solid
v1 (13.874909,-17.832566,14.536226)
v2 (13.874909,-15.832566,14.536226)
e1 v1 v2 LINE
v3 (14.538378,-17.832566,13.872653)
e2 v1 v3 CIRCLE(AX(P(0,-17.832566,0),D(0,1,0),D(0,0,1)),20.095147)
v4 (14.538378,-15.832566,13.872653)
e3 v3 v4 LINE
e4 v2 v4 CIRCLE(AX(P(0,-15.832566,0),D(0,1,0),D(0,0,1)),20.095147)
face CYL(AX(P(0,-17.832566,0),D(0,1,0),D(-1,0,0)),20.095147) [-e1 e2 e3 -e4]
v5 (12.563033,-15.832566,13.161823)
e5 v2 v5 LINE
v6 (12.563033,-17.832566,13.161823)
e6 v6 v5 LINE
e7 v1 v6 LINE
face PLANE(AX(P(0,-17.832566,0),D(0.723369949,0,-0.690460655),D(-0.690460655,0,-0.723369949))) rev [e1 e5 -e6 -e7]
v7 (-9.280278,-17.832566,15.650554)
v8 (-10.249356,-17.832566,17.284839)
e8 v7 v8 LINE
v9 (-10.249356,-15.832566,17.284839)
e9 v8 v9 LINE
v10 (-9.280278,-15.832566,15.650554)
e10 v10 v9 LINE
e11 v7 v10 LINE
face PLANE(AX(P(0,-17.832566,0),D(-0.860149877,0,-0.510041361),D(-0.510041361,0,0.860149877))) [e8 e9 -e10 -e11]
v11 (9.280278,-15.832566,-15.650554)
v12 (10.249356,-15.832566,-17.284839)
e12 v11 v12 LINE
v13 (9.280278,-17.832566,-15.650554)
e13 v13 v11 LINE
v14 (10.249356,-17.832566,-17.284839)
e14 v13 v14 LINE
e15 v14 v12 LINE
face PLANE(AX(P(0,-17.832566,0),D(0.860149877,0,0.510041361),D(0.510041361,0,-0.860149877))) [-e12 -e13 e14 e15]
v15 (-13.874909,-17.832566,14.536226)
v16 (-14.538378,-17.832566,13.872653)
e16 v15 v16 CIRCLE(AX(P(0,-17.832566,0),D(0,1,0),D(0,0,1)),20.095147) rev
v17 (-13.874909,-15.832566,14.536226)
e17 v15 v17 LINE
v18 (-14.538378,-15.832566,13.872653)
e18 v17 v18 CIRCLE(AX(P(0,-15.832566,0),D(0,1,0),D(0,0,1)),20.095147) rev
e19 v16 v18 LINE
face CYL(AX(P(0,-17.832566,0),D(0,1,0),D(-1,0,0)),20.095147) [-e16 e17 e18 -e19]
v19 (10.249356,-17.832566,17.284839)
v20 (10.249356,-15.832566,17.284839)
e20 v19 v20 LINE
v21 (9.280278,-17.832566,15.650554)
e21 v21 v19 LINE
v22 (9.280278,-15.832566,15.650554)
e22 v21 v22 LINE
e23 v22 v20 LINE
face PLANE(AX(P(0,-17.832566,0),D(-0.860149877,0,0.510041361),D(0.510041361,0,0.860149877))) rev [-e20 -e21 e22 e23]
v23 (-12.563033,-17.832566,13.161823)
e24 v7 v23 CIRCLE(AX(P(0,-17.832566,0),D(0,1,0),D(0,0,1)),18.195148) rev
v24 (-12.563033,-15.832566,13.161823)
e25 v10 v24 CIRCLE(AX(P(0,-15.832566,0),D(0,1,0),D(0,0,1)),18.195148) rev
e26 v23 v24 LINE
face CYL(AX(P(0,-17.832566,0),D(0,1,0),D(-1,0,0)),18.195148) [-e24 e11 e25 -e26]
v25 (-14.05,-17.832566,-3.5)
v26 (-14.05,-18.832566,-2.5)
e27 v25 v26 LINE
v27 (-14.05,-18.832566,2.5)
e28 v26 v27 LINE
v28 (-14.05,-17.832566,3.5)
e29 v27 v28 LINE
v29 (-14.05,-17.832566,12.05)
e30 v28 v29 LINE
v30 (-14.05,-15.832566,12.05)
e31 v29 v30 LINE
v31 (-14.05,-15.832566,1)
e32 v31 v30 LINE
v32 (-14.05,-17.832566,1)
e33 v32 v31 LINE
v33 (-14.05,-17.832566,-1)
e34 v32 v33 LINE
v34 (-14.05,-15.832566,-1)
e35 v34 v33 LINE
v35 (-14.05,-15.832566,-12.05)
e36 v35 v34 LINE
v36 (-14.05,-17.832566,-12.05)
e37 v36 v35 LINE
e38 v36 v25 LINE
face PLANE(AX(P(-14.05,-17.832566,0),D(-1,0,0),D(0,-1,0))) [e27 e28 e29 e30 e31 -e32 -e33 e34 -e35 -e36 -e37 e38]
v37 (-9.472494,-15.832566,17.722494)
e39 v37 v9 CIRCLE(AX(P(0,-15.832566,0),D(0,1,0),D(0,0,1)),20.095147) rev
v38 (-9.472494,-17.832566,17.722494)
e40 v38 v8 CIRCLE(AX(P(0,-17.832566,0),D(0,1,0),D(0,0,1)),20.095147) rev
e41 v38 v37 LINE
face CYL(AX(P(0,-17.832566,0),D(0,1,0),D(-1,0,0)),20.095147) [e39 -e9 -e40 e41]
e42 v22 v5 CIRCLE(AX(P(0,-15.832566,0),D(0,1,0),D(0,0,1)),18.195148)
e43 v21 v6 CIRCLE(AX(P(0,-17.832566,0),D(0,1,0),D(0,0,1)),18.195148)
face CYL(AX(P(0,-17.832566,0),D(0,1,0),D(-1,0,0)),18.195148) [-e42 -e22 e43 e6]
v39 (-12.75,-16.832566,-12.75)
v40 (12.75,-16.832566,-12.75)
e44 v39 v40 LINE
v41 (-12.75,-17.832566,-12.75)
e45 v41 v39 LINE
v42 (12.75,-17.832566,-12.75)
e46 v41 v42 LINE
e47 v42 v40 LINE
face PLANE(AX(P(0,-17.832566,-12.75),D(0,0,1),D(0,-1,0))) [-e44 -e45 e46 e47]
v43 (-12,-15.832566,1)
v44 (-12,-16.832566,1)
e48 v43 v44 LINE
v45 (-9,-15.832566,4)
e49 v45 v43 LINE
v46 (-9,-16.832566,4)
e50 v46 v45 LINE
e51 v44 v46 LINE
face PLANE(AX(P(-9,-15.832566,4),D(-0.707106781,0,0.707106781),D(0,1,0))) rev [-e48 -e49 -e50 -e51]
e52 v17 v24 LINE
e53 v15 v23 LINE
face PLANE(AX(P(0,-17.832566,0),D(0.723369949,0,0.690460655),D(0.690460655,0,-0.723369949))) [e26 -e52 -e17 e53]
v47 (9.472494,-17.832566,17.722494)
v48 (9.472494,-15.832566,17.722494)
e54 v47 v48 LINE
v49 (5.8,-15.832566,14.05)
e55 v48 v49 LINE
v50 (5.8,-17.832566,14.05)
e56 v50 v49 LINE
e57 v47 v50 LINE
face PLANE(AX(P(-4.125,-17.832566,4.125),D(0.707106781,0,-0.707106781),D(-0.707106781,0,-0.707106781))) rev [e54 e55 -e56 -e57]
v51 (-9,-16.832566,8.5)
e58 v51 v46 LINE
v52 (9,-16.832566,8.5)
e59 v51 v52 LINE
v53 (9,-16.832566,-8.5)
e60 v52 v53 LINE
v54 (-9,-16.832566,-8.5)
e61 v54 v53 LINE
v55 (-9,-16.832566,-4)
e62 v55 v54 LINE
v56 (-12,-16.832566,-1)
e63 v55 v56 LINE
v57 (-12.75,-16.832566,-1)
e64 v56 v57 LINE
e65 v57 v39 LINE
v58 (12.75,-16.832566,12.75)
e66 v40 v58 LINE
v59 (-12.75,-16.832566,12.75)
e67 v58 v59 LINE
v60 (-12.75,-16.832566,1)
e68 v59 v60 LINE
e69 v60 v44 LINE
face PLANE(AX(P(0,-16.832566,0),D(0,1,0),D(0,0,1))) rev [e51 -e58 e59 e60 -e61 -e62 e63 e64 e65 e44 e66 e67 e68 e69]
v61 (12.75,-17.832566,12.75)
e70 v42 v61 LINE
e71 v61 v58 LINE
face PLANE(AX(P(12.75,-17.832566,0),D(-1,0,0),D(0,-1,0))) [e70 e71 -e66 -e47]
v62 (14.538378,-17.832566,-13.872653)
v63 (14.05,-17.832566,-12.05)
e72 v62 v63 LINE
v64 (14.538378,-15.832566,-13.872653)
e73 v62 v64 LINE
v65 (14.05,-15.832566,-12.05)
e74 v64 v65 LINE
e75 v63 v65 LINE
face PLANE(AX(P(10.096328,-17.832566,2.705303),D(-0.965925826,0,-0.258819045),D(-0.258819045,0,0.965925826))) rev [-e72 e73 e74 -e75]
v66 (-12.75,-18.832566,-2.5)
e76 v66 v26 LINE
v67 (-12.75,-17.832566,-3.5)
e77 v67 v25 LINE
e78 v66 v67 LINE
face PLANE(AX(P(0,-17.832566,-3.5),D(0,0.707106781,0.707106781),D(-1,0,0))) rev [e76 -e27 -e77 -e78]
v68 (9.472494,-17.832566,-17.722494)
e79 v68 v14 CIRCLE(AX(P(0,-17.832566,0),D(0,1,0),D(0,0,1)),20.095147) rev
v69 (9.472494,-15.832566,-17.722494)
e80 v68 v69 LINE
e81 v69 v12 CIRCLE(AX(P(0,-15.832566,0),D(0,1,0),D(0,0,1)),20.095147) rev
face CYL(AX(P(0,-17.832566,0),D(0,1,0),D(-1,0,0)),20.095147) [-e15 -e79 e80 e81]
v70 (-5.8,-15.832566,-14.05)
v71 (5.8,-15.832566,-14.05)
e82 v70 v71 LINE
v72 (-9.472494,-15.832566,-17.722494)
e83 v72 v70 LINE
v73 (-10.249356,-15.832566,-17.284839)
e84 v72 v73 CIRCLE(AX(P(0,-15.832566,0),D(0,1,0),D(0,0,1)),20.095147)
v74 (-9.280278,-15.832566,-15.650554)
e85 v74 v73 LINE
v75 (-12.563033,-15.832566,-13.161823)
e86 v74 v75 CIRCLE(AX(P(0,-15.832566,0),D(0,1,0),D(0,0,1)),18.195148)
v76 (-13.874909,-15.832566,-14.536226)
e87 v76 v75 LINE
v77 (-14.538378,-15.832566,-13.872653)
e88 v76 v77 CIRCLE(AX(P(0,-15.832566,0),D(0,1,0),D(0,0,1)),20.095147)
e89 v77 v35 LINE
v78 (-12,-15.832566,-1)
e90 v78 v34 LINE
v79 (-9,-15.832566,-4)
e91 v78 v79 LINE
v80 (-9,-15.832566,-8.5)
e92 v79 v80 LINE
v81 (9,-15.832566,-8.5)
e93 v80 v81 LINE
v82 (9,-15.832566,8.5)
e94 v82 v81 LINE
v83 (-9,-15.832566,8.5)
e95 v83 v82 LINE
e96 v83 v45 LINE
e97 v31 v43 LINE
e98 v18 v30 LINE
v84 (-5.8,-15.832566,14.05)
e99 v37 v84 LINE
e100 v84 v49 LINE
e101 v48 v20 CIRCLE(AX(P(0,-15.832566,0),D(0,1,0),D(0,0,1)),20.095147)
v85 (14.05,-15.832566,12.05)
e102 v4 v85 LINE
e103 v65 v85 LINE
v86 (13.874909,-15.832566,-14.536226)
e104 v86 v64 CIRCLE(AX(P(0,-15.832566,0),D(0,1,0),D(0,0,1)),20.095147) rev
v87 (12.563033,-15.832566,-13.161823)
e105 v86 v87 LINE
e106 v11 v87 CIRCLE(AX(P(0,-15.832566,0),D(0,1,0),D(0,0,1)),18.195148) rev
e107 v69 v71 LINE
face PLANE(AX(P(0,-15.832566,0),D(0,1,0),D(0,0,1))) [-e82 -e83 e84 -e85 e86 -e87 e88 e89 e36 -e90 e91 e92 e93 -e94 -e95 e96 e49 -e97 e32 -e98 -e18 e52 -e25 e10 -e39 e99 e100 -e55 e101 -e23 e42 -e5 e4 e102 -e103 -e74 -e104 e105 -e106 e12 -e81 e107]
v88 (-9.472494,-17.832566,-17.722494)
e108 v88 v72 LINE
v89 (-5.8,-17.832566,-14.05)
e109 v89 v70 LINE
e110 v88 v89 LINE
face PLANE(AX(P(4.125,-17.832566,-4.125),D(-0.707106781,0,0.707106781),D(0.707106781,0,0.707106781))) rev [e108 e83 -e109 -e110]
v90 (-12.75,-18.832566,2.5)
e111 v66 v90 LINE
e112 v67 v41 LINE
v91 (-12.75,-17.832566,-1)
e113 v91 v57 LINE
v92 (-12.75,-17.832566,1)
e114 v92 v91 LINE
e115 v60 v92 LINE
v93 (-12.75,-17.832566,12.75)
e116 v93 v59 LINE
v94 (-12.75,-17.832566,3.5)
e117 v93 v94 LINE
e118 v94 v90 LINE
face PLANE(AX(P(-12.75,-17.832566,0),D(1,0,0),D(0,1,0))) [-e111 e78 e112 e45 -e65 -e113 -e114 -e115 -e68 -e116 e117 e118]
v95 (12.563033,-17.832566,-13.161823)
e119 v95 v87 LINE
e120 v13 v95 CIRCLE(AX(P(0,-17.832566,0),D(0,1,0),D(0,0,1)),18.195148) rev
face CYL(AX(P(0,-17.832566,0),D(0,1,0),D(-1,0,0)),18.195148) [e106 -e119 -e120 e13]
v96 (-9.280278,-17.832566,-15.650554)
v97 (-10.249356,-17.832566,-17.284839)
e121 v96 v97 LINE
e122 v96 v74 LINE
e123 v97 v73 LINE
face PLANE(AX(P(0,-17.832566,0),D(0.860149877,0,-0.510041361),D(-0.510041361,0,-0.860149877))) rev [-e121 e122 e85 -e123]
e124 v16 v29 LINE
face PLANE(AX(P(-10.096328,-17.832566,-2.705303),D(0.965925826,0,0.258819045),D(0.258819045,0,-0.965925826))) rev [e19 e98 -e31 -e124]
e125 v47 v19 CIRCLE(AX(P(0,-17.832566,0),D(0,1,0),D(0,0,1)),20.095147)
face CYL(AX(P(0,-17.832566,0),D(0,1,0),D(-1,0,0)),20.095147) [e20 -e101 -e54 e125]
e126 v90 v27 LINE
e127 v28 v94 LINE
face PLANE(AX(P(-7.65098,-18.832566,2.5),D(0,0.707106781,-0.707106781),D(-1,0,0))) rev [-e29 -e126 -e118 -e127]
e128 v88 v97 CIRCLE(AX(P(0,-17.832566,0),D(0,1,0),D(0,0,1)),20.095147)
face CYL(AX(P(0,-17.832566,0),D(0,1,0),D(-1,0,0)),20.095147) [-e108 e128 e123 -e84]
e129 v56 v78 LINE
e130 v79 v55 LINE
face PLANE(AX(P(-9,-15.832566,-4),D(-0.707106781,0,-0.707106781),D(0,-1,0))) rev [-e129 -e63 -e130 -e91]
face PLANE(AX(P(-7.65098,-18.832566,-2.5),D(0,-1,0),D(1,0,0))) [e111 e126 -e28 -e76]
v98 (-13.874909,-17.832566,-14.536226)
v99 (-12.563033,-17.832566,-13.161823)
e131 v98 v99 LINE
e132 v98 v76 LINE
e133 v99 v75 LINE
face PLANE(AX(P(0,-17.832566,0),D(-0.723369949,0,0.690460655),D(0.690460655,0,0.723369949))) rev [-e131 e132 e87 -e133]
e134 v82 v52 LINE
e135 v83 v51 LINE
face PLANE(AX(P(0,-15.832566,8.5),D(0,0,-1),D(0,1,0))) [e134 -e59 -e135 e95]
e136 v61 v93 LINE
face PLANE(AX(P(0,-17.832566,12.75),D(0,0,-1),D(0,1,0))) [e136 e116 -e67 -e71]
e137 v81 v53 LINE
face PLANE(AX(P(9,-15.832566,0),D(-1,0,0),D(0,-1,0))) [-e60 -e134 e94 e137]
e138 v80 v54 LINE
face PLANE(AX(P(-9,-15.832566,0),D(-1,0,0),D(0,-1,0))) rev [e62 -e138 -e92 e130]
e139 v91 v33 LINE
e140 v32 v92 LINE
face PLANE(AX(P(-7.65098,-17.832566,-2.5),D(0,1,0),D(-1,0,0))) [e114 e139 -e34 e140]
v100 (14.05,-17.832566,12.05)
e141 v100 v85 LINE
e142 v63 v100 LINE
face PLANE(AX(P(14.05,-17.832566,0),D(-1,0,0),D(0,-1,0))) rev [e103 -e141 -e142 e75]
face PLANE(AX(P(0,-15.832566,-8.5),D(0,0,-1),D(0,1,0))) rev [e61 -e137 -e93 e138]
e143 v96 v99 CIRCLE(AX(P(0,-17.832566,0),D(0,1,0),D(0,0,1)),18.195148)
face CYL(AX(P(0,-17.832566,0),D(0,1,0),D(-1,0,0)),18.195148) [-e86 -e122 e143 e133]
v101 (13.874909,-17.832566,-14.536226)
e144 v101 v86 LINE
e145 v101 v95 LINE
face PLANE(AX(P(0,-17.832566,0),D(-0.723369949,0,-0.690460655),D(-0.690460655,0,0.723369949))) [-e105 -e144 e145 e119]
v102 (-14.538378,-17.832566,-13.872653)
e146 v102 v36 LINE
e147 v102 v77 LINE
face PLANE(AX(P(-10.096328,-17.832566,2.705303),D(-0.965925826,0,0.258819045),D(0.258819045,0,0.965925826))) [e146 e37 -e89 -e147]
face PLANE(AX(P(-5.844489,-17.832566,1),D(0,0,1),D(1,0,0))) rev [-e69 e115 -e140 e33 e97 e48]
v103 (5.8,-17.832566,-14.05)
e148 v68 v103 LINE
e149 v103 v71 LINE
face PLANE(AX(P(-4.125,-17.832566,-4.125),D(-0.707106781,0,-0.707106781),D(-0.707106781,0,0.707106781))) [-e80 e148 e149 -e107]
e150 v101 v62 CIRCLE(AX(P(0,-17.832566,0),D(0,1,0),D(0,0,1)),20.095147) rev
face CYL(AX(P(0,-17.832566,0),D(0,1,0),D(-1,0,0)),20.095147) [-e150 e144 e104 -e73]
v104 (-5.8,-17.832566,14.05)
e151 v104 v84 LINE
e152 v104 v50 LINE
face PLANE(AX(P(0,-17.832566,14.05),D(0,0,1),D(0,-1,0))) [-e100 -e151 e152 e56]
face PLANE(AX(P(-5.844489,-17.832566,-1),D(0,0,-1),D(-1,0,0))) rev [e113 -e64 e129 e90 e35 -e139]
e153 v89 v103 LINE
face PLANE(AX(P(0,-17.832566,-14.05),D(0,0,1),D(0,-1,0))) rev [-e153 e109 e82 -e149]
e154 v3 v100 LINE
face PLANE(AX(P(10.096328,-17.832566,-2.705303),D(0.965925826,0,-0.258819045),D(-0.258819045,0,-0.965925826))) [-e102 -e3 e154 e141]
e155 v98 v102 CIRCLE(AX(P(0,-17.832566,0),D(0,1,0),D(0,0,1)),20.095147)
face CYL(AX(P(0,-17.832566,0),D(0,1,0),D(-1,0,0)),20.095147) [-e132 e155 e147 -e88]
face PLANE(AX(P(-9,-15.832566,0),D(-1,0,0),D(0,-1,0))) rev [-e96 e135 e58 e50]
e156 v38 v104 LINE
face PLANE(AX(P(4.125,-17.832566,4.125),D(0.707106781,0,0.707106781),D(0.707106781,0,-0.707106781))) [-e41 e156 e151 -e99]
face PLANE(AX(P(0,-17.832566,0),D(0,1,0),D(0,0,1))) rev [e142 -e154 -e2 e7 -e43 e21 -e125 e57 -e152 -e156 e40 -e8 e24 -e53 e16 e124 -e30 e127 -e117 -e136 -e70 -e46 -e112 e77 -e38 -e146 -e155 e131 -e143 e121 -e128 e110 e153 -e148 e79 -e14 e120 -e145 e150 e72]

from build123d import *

# Parameters (mm, degrees)
BOSS_EXTRUDE3_DEPTH      = 1
BOSS_EXTRUDE3_DEPTH_BACK = 1
SKETCH3_W                = 18
SKETCH3_H                = 17
CUT_EXTRUDE1_DEPTH       = 23.944525539
SKETCH3_4_W              = 25.5
SKETCH3_4_H              = 25.5
SKETCH3_4_W_2            = 18
SKETCH3_4_H_2            = 17
CUT_EXTRUDE3_DEPTH       = 23.944525539
CUT_EXTRUDE4_DEPTH       = 23.944525539
CUT_EXTRUDE4_DEPTH_BACK  = 23.944525539
SKETCH4_W                = 16
SKETCH4_H                = 2
CHAMFER1_SIZE            = 3
SKETCH6_W                = 5
SKETCH6_H                = 1
BOSS_EXTRUDE5_DEPTH      = 1.3
CHAMFER2_SIZE            = 1


with BuildPart() as part:
    # Sketch2 → Boss-Extrude3 (new, two sides: drawn at the far end of the back side and taken through both)
    with BuildSketch(Plane(origin=(0, -16.832566415, 0), x_dir=(1, 0, 0), z_dir=(0, 1, 0)).offset(-BOSS_EXTRUDE3_DEPTH_BACK)):
        with BuildLine():
            Line((14.05, -12.05), (14.05, 12.05))
            Line((14.05, 12.05), (14.538378439, 13.872653149))
            ThreePointArc((14.538378439, 13.872653149), (14.210517369, 14.208312678), (13.874908715, 14.536225824))
            Line((13.874908715, 14.536225824), (12.56303347, 13.16182292))
            ThreePointArc((12.56303347, 13.16182292), (10.992315824, 14.499392587), (9.280277793, 15.650553876))
            Line((9.280277793, 15.650553876), (10.249356378, 17.284838642))
            ThreePointArc((10.249356378, 17.284838642), (9.863353095, 17.507975862), (9.47249431, 17.72249431))
            Line((9.47249431, 17.72249431), (5.8, 14.05))
            Line((5.8, 14.05), (-5.8, 14.05))
            Line((-5.8, 14.05), (-9.47249431, 17.72249431))
            ThreePointArc((-9.47249431, 17.72249431), (-9.863353095, 17.507975862), (-10.249356378, 17.284838642))
            Line((-10.249356378, 17.284838642), (-9.280277793, 15.650553876))
            ThreePointArc((-9.280277793, 15.650553876), (-10.992315824, 14.499392587), (-12.56303347, 13.16182292))
            Line((-12.56303347, 13.16182292), (-13.874908715, 14.536225824))
            ThreePointArc((-13.874908715, 14.536225824), (-14.210517369, 14.208312678), (-14.538378439, 13.872653149))
            Line((-14.538378439, 13.872653149), (-14.05, 12.05))
            Line((-14.05, 12.05), (-14.05, -12.05))
            Line((-14.05, -12.05), (-14.538378439, -13.872653149))
            ThreePointArc((-14.538378439, -13.872653149), (-14.210517369, -14.208312678), (-13.874908715, -14.536225824))
            Line((-13.874908715, -14.536225824), (-12.56303347, -13.16182292))
            ThreePointArc((-12.56303347, -13.16182292), (-10.992315824, -14.499392587), (-9.280277793, -15.650553876))
            Line((-9.280277793, -15.650553876), (-10.249356378, -17.284838642))
            ThreePointArc((-10.249356378, -17.284838642), (-9.863353095, -17.507975862), (-9.47249431, -17.72249431))
            Line((-9.47249431, -17.72249431), (-5.8, -14.05))
            Line((-5.8, -14.05), (5.8, -14.05))
            Line((5.8, -14.05), (9.47249431, -17.72249431))
            ThreePointArc((9.47249431, -17.72249431), (9.863353095, -17.507975862), (10.249356378, -17.284838642))
            Line((10.249356378, -17.284838642), (9.280277793, -15.650553876))
            ThreePointArc((9.280277793, -15.650553876), (10.992315824, -14.499392587), (12.56303347, -13.16182292))
            Line((12.56303347, -13.16182292), (13.874908715, -14.536225824))
            ThreePointArc((13.874908715, -14.536225824), (14.210517369, -14.208312678), (14.538378439, -13.872653149))
            Line((14.538378439, -13.872653149), (14.05, -12.05))
        make_face()
    extrude(amount=BOSS_EXTRUDE3_DEPTH + BOSS_EXTRUDE3_DEPTH_BACK)

    # Sketch3 → Cut-Extrude1 (cut, through all)
    with BuildSketch(Plane(origin=(0, -16.832566415, 0), x_dir=(1, 0, 0), z_dir=(0, 1, 0))):
        Rectangle(SKETCH3_W, SKETCH3_H)
    extrude(amount=CUT_EXTRUDE1_DEPTH, mode=Mode.SUBTRACT)

    # Sketch3<4> → Cut-Extrude3 (cut, through all)
    # profile 1 of 2: a face of its own
    with BuildSketch(Plane(origin=(0, -16.832566415, 0), x_dir=(1, 0, 0), z_dir=(0, 1, 0))):
        Rectangle(SKETCH3_4_W, SKETCH3_4_H)
        Rectangle(SKETCH3_4_W_2, SKETCH3_4_H_2, mode=Mode.SUBTRACT)
    # profile 2 of 2: a face of its own
    with BuildSketch(Plane(origin=(0, -16.832566415, 0), x_dir=(1, 0, 0), z_dir=(0, 1, 0))):
        Rectangle(SKETCH3_4_W_2, SKETCH3_4_H_2)
    extrude(amount=-CUT_EXTRUDE3_DEPTH, mode=Mode.SUBTRACT)

    # Sketch4 → Cut-Extrude4 (cut, two sides: drawn at the far end of the back side and taken through both)
    with BuildSketch(Plane(origin=(0, -16.832566415, 0), x_dir=(1, 0, 0), z_dir=(0, 1, 0)).offset(-CUT_EXTRUDE4_DEPTH_BACK)):
        with Locations((-13.844488576, 0)):
            Rectangle(SKETCH4_W, SKETCH4_H)
    extrude(amount=CUT_EXTRUDE4_DEPTH + CUT_EXTRUDE4_DEPTH_BACK, mode=Mode.SUBTRACT)

    # Chamfer1
    chamfer1_edges = [part.edges().sort_by_distance(p)[0] for p in [
        (-9, -16.332566415, -1),
        (-9, -16.332566415, 1),
    ]]
    chamfer(chamfer1_edges, length=CHAMFER1_SIZE)

    # Sketch6 → Boss-Extrude5 (add)
    with BuildSketch(Plane.ZY.offset(14.05)):
        with Locations((0, -18.332566415)):
            Rectangle(SKETCH6_W, SKETCH6_H)
    extrude(amount=-BOSS_EXTRUDE5_DEPTH)

    # Chamfer2
    chamfer2_edges = [part.edges().sort_by_distance(p)[0] for p in [
        (-13.4, -17.832566415, 2.5),
        (-13.4, -17.832566415, -2.5),
    ]]
    chamfer(chamfer2_edges, length=CHAMFER2_SIZE - 0.0001)  # a hair under: the kernel refuses the full size


solid = part.part
